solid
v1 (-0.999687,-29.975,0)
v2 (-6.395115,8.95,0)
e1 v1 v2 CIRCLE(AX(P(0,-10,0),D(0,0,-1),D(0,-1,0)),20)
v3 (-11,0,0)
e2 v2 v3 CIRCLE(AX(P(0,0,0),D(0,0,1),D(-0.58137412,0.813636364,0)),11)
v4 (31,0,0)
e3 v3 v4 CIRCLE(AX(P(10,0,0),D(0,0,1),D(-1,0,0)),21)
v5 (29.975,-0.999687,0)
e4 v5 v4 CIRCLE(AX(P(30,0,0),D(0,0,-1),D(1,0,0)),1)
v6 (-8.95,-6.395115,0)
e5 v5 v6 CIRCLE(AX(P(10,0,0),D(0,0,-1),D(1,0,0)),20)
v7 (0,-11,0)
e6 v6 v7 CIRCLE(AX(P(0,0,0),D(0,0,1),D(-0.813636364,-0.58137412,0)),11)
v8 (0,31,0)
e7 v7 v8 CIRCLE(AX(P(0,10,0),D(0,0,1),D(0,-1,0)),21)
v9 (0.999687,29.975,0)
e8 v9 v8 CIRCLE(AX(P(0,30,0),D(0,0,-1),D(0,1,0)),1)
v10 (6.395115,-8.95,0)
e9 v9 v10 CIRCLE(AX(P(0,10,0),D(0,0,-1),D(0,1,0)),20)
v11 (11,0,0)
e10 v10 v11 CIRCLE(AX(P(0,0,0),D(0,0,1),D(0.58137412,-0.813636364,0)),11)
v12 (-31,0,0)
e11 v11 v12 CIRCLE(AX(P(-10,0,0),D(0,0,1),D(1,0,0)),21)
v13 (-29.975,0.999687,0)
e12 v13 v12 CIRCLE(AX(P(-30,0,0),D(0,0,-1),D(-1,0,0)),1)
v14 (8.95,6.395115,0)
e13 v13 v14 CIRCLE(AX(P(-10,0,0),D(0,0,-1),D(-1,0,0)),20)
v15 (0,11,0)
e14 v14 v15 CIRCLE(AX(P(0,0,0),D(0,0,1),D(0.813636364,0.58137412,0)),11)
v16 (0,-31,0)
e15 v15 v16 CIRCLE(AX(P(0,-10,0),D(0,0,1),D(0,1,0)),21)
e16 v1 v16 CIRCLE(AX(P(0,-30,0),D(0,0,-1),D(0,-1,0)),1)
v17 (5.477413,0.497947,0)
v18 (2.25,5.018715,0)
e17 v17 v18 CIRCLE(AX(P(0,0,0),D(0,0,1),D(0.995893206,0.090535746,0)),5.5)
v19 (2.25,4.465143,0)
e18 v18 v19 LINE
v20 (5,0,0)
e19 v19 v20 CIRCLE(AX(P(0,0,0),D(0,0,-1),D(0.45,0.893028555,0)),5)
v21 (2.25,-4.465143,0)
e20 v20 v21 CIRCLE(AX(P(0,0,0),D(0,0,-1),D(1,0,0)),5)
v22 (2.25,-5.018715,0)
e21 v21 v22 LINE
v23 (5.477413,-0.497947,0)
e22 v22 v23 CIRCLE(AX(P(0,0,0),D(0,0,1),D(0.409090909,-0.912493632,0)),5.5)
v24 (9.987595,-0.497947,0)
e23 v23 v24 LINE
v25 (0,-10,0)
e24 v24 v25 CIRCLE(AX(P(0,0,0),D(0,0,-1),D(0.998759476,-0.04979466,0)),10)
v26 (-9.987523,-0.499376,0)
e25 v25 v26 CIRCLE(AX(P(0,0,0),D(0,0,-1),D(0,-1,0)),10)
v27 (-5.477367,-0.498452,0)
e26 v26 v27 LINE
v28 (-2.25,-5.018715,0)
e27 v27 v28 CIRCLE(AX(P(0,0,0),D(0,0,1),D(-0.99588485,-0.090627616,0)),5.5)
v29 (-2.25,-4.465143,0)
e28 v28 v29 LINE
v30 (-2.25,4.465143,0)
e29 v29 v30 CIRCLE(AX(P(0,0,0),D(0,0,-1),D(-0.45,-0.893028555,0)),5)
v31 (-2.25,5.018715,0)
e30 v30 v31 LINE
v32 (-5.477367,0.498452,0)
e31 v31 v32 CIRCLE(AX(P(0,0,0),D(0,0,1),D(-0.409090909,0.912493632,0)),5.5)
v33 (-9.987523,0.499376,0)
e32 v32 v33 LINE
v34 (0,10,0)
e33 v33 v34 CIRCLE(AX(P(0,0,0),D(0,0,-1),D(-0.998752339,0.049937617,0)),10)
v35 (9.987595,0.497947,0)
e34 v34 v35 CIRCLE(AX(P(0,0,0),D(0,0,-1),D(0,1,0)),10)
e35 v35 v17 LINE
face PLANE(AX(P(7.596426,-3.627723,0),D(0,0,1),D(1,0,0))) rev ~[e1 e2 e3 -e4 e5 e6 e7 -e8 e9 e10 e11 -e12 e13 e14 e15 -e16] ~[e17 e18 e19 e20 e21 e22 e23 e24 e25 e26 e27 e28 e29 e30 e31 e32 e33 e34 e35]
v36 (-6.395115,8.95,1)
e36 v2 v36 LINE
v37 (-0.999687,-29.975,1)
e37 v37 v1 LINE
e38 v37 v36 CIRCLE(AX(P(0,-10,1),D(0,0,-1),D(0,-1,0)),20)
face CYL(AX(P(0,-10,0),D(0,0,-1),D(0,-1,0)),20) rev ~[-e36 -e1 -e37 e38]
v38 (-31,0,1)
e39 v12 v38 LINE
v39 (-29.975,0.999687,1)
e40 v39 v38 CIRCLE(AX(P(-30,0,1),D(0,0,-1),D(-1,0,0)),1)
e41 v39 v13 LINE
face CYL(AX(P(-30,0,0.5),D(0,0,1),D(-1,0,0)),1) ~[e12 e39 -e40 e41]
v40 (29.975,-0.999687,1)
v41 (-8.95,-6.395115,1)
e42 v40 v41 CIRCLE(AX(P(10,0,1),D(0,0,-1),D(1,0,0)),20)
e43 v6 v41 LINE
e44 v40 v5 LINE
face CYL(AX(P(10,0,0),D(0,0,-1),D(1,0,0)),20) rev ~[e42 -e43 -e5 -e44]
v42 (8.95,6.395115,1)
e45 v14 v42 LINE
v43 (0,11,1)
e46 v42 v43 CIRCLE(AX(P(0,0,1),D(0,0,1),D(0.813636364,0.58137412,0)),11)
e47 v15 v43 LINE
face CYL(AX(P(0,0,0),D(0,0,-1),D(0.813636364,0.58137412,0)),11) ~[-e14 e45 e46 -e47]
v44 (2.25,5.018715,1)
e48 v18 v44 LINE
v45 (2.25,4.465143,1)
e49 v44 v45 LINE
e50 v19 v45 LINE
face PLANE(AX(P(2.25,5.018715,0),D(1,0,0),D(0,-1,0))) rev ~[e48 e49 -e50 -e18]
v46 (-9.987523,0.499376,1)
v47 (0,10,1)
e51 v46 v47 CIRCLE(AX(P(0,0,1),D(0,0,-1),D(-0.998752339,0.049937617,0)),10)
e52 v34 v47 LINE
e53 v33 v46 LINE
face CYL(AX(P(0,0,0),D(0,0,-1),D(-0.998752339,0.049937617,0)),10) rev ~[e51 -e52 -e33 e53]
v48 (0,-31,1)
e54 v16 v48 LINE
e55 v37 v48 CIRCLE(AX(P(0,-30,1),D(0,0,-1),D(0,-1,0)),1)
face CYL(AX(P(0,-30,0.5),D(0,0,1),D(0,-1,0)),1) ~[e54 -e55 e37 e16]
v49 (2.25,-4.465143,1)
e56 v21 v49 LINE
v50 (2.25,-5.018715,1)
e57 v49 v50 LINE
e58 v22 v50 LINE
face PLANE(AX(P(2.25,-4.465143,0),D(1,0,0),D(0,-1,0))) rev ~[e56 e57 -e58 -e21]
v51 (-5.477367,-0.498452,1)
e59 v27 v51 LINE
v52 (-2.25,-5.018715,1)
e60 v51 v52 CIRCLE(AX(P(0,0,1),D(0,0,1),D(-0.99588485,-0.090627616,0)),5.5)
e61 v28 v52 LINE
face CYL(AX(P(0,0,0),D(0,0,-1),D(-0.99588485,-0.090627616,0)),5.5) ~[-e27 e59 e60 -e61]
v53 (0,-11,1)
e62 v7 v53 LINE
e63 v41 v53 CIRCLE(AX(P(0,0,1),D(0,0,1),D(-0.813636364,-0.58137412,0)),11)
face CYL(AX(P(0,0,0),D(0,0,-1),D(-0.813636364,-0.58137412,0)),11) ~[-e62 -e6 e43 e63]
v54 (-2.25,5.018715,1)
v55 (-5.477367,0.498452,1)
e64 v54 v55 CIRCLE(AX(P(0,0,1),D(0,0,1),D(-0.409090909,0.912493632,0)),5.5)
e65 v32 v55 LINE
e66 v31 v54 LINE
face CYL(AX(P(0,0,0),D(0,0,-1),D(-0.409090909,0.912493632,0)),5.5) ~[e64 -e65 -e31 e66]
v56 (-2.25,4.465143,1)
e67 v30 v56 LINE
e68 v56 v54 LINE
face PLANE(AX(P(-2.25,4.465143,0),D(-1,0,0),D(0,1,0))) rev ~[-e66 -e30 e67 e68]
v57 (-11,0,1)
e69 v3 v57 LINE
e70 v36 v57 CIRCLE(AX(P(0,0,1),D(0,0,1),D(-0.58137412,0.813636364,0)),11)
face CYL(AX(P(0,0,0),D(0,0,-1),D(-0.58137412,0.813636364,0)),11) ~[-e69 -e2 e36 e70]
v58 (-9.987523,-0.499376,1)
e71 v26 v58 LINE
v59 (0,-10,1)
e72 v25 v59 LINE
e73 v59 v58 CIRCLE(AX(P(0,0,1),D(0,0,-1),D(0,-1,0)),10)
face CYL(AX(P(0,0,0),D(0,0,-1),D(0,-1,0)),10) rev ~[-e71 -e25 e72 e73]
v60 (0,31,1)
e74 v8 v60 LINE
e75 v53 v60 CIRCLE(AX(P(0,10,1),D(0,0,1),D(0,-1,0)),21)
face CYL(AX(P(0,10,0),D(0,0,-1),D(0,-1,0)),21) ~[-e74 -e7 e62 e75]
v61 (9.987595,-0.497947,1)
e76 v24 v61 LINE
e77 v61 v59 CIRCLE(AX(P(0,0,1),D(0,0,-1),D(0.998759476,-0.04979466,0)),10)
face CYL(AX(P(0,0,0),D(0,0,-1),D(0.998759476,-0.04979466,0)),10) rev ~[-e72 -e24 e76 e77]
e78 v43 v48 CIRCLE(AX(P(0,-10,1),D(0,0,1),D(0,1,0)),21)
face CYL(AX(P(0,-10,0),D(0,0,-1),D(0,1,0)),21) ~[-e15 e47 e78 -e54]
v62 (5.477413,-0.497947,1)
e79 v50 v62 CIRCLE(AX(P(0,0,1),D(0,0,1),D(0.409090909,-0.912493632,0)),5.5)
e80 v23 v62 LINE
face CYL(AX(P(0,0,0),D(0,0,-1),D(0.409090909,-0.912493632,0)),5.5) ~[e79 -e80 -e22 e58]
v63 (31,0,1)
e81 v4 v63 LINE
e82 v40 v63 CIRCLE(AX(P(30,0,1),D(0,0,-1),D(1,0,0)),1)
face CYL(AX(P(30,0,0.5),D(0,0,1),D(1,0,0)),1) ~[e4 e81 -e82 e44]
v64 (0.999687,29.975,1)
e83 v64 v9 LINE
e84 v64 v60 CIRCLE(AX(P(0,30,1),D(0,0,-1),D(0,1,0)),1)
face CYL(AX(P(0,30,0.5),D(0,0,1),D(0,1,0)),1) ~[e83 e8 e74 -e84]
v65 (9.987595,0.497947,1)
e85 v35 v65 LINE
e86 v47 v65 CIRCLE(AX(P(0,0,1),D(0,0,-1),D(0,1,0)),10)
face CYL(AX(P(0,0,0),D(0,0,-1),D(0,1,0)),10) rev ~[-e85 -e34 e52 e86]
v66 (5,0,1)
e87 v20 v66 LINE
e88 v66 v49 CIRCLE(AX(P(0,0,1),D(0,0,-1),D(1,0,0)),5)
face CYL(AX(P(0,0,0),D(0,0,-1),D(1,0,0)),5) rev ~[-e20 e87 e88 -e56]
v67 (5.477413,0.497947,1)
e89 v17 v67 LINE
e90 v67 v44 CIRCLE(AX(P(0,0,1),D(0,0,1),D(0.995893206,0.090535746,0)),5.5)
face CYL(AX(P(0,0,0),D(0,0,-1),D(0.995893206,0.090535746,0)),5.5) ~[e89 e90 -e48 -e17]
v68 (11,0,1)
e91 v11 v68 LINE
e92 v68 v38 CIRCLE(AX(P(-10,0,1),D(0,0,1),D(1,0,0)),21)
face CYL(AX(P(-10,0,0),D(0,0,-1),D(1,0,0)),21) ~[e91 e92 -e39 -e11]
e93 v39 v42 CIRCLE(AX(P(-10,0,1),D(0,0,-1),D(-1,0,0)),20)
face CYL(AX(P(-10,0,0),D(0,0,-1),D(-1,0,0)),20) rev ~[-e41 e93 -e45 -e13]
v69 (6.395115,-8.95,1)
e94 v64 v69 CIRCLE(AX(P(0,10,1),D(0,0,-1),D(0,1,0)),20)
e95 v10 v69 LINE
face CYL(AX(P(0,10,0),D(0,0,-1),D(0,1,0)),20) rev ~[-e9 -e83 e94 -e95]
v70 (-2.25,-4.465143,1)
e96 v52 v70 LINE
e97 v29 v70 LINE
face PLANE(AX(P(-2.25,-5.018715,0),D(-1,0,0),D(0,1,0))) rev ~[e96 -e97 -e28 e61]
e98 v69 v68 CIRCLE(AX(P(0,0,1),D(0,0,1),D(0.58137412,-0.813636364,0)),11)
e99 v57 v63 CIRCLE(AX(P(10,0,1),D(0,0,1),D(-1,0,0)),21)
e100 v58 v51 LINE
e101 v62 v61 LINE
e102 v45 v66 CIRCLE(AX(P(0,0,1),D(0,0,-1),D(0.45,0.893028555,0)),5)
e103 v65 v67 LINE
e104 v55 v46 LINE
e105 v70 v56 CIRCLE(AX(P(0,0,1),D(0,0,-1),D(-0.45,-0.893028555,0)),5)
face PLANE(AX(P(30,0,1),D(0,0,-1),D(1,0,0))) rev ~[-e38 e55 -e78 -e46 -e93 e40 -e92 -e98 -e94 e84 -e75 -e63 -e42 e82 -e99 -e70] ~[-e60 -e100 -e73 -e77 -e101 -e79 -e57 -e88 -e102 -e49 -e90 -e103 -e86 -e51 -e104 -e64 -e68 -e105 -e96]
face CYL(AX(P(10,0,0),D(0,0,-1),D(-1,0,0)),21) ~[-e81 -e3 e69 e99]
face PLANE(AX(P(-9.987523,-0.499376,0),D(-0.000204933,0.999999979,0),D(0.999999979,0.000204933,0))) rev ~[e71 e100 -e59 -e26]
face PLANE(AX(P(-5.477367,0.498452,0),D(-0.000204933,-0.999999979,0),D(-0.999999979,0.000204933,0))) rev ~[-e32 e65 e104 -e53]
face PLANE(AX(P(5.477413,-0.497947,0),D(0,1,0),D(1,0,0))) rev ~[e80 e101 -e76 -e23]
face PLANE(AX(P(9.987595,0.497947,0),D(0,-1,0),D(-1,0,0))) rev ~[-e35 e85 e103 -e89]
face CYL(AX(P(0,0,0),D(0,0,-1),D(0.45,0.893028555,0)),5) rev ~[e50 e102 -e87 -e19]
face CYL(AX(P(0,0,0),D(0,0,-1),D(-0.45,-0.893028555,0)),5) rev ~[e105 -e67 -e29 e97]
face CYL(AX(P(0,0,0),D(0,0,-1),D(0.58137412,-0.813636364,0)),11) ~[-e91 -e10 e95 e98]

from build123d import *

# Parameters (mm, degrees)
F1_DEPTH   = 1
F1_FACE_W  = 1
F1_FACE_H  = 1
F1_FACE1_W = 1
F1_FACE1_H = 1
F1_FACE2_W = 1
F1_FACE2_H = 1
F1_FACE3_W = 1
F1_FACE3_H = 1


# Not quite as in the source:
# - a feature names something its author has since deleted; it is built from what else it names


with BuildPart() as f1:
    # F0 (on Top) → F1 (new body)
    with BuildSketch(Plane.XY):
        with BuildLine():
            ThreePointArc((8.95, 6.3951153234), (9.735754356, 3.2403703492), (10, 0))
            ThreePointArc((10, 0), (9.9968982101, -0.2490505519), (9.9875947645, -0.4979466032))
            ThreePointArc((9.9875947645, -0.4979466032), (6.8927691811, -7.2449798493), (0, -10))
            ThreePointArc((0, -10), (3.2403703492, -9.735754356), (6.3951153234, -8.95))
            ThreePointArc((6.3951153234, -8.95), (9.7812644519, -5.0325804237), (11, 0))
            ThreePointArc((11, 0), (10.474970167, 3.3578266781), (8.95, 6.3951153234))
        make_face()
        with BuildLine():
            ThreePointArc((9.9875947645, 0.4979466032), (9.9968982101, 0.2490505519), (10, 0))
            ThreePointArc((10, 0), (9.735754356, 3.2403703492), (8.95, 6.3951153234))
            ThreePointArc((8.95, 6.3951153234), (5.0325804237, 9.7812644519), (0, 11))
            ThreePointArc((0, 11), (-3.3578266781, 10.474970167), (-6.3951153234, 8.95))
            ThreePointArc((-6.3951153234, 8.95), (-3.2403703492, 9.735754356), (0, 10))
            ThreePointArc((0, 10), (6.8927691811, 7.2449798493), (9.9875947645, 0.4979466032))
        make_face()
        with BuildLine():
            ThreePointArc((-30, 0), (-13.2403703492, 19.735754356), (8.95, 6.3951153234))
            ThreePointArc((8.95, 6.3951153234), (10.474970167, 3.3578266781), (11, 0))
            ThreePointArc((11, 0), (-10, 21), (-31, 0))
            Line((-31, 0), (-30, 0))
        make_face()
        with BuildLine():
            ThreePointArc((-9.9875233888, 0.4993761694), (-6.8922506595, 7.2454731279), (0, 10))
            ThreePointArc((0, 10), (-3.2403703492, 9.735754356), (-6.3951153234, 8.95))
            ThreePointArc((-6.3951153234, 8.95), (-9.7812644519, 5.0325804237), (-11, 0))
            ThreePointArc((-11, 0), (-10.474970167, -3.3578266781), (-8.95, -6.3951153234))
            ThreePointArc((-8.95, -6.3951153234), (-9.735754356, -3.2403703492), (-10, 0))
            ThreePointArc((-10, 0), (-9.9968803606, 0.2497660027), (-9.9875233888, 0.4993761694))
        make_face()
        with BuildLine():
            ThreePointArc((6.3951153234, -8.95), (3.2403703492, -9.735754356), (0, -10))
            ThreePointArc((0, -10), (-6.8922506595, -7.2454731279), (-9.9875233888, -0.4993761694))
            ThreePointArc((-9.9875233888, -0.4993761694), (-9.9968803606, -0.2497660027), (-10, 0))
            ThreePointArc((-10, 0), (-9.735754356, -3.2403703492), (-8.95, -6.3951153234))
            ThreePointArc((-8.95, -6.3951153234), (-5.0325804237, -9.7812644519), (0, -11))
            ThreePointArc((0, -11), (3.3578266781, -10.474970167), (6.3951153234, -8.95))
        make_face()
        with BuildLine():
            ThreePointArc((-6.3951153234, 8.95), (-3.3578266781, 10.474970167), (0, 11))
            ThreePointArc((0, 11), (-21, -10), (0, -31))
            Line((0, -31), (0, -30))
            ThreePointArc((0, -30), (-19.735754356, -13.2403703492), (-6.3951153234, 8.95))
        make_face()
        with BuildLine():
            ThreePointArc((0, 30), (19.735754356, 13.2403703492), (6.3951153234, -8.95))
            ThreePointArc((6.3951153234, -8.95), (3.3578266781, -10.474970167), (0, -11))
            ThreePointArc((0, -11), (21, 10), (0, 31))
            Line((0, 31), (0, 30))
        make_face()
        with BuildLine():
            ThreePointArc((-8.95, -6.3951153234), (-10.474970167, -3.3578266781), (-11, 0))
            ThreePointArc((-11, 0), (10, -21), (31, 0))
            Line((31, 0), (30, 0))
            ThreePointArc((30, 0), (13.2403703492, -19.735754356), (-8.95, -6.3951153234))
        make_face()
        with BuildLine():
            ThreePointArc((5.5, 0), (5.4943502571, 0.2492293164), (5.4774126356, 0.4979466032))
            ThreePointArc((5.4774126356, 0.4979466032), (4.4763336759, 3.1956903514), (2.25, 5.018714975))
            Line((2.25, 5.018714975), (2.25, 4.4651427749))
            ThreePointArc((2.25, 4.4651427749), (4.2573465915, 2.6220221204), (5, 0))
            ThreePointArc((5, 0), (4.2573465915, -2.6220221204), (2.25, -4.4651427749))
            Line((2.25, -4.4651427749), (2.25, -5.018714975))
            ThreePointArc((2.25, -5.018714975), (4.4763336759, -3.1956903514), (5.4774126356, -0.4979466032))
            ThreePointArc((5.4774126356, -0.4979466032), (5.4943502571, -0.2492293164), (5.5, 0))
        make_face()
        with BuildLine():
            ThreePointArc((9.9875947645, -0.4979466032), (9.9968982101, -0.2490505519), (10, 0))
            ThreePointArc((10, 0), (9.9968982101, 0.2490505519), (9.9875947645, 0.4979466032))
            Line((9.9875947645, 0.4979466032), (5.4774126356, 0.4979466032))
            ThreePointArc((5.4774126356, 0.4979466032), (5.4943502571, 0.2492293164), (5.5, 0))
            ThreePointArc((5.5, 0), (5.4943502571, -0.2492293164), (5.4774126356, -0.4979466032))
            Line((5.4774126356, -0.4979466032), (9.9875947645, -0.4979466032))
        make_face()
        with BuildLine():
            ThreePointArc((-2.25, 5.018714975), (-4.4761862714, 3.1958968168), (-5.4773666772, 0.4984518873))
            ThreePointArc((-5.4773666772, 0.4984518873), (-5.5, 0), (-5.4773666772, -0.4984518873))
            ThreePointArc((-5.4773666772, -0.4984518873), (-4.4761862714, -3.1958968168), (-2.25, -5.018714975))
            Line((-2.25, -5.018714975), (-2.25, -4.4651427749))
            ThreePointArc((-2.25, -4.4651427749), (-5, 0), (-2.25, 4.4651427749))
            Line((-2.25, 4.4651427749), (-2.25, 5.018714975))
        make_face()
        with BuildLine():
            Line((-5.4773666772, 0.4984518873), (-9.9875233888, 0.4993761694))
            ThreePointArc((-9.9875233888, 0.4993761694), (-9.9968803606, 0.2497660027), (-10, 0))
            ThreePointArc((-10, 0), (-9.9968803606, -0.2497660027), (-9.9875233888, -0.4993761694))
            Line((-9.9875233888, -0.4993761694), (-5.4773666772, -0.4984518873))
            ThreePointArc((-5.4773666772, -0.4984518873), (-5.5, 0), (-5.4773666772, 0.4984518873))
        make_face()
    extrude(amount=F1_DEPTH)

    # F1_face (on face) → F2 (revolve)
    with BuildSketch(Plane(origin=(-30.5, 0, 0.5), x_dir=(1, 0, 0), z_dir=(0, -1, 0))):
        Rectangle(F1_FACE_W, F1_FACE_H)
    revolve(axis=Axis((-30, 0, 0.5), (0, 0, -1)))

    # F1_face1 (on face) → F3 (revolve)
    with BuildSketch(Plane(origin=(0, -30.5, 0.5), x_dir=(0, 1, 0), z_dir=(1, 0, 0))):
        Rectangle(F1_FACE1_W, F1_FACE1_H)
    revolve(axis=Axis((0, -30, 0.5), (0, 0, -1)))

    # F1_face2 (on face) → F4 (revolve)
    with BuildSketch(Plane(origin=(30.5, 0, 0.5), x_dir=(-1, 0, 0), z_dir=(0, 1, 0))):
        Rectangle(F1_FACE2_W, F1_FACE2_H)
    revolve(axis=Axis((30, 0, 0.5), (0, 0, -1)))

    # F1_face3 (on face) → F5 (revolve)
    with BuildSketch(Plane(origin=(0, 30.5, 0.5), x_dir=(0, -1, 0), z_dir=(-1, 0, 0))):
        Rectangle(F1_FACE3_W, F1_FACE3_H)
    revolve(axis=Axis((0, 30, 0.5), (0, 0, -1)))


solid = f1.part
